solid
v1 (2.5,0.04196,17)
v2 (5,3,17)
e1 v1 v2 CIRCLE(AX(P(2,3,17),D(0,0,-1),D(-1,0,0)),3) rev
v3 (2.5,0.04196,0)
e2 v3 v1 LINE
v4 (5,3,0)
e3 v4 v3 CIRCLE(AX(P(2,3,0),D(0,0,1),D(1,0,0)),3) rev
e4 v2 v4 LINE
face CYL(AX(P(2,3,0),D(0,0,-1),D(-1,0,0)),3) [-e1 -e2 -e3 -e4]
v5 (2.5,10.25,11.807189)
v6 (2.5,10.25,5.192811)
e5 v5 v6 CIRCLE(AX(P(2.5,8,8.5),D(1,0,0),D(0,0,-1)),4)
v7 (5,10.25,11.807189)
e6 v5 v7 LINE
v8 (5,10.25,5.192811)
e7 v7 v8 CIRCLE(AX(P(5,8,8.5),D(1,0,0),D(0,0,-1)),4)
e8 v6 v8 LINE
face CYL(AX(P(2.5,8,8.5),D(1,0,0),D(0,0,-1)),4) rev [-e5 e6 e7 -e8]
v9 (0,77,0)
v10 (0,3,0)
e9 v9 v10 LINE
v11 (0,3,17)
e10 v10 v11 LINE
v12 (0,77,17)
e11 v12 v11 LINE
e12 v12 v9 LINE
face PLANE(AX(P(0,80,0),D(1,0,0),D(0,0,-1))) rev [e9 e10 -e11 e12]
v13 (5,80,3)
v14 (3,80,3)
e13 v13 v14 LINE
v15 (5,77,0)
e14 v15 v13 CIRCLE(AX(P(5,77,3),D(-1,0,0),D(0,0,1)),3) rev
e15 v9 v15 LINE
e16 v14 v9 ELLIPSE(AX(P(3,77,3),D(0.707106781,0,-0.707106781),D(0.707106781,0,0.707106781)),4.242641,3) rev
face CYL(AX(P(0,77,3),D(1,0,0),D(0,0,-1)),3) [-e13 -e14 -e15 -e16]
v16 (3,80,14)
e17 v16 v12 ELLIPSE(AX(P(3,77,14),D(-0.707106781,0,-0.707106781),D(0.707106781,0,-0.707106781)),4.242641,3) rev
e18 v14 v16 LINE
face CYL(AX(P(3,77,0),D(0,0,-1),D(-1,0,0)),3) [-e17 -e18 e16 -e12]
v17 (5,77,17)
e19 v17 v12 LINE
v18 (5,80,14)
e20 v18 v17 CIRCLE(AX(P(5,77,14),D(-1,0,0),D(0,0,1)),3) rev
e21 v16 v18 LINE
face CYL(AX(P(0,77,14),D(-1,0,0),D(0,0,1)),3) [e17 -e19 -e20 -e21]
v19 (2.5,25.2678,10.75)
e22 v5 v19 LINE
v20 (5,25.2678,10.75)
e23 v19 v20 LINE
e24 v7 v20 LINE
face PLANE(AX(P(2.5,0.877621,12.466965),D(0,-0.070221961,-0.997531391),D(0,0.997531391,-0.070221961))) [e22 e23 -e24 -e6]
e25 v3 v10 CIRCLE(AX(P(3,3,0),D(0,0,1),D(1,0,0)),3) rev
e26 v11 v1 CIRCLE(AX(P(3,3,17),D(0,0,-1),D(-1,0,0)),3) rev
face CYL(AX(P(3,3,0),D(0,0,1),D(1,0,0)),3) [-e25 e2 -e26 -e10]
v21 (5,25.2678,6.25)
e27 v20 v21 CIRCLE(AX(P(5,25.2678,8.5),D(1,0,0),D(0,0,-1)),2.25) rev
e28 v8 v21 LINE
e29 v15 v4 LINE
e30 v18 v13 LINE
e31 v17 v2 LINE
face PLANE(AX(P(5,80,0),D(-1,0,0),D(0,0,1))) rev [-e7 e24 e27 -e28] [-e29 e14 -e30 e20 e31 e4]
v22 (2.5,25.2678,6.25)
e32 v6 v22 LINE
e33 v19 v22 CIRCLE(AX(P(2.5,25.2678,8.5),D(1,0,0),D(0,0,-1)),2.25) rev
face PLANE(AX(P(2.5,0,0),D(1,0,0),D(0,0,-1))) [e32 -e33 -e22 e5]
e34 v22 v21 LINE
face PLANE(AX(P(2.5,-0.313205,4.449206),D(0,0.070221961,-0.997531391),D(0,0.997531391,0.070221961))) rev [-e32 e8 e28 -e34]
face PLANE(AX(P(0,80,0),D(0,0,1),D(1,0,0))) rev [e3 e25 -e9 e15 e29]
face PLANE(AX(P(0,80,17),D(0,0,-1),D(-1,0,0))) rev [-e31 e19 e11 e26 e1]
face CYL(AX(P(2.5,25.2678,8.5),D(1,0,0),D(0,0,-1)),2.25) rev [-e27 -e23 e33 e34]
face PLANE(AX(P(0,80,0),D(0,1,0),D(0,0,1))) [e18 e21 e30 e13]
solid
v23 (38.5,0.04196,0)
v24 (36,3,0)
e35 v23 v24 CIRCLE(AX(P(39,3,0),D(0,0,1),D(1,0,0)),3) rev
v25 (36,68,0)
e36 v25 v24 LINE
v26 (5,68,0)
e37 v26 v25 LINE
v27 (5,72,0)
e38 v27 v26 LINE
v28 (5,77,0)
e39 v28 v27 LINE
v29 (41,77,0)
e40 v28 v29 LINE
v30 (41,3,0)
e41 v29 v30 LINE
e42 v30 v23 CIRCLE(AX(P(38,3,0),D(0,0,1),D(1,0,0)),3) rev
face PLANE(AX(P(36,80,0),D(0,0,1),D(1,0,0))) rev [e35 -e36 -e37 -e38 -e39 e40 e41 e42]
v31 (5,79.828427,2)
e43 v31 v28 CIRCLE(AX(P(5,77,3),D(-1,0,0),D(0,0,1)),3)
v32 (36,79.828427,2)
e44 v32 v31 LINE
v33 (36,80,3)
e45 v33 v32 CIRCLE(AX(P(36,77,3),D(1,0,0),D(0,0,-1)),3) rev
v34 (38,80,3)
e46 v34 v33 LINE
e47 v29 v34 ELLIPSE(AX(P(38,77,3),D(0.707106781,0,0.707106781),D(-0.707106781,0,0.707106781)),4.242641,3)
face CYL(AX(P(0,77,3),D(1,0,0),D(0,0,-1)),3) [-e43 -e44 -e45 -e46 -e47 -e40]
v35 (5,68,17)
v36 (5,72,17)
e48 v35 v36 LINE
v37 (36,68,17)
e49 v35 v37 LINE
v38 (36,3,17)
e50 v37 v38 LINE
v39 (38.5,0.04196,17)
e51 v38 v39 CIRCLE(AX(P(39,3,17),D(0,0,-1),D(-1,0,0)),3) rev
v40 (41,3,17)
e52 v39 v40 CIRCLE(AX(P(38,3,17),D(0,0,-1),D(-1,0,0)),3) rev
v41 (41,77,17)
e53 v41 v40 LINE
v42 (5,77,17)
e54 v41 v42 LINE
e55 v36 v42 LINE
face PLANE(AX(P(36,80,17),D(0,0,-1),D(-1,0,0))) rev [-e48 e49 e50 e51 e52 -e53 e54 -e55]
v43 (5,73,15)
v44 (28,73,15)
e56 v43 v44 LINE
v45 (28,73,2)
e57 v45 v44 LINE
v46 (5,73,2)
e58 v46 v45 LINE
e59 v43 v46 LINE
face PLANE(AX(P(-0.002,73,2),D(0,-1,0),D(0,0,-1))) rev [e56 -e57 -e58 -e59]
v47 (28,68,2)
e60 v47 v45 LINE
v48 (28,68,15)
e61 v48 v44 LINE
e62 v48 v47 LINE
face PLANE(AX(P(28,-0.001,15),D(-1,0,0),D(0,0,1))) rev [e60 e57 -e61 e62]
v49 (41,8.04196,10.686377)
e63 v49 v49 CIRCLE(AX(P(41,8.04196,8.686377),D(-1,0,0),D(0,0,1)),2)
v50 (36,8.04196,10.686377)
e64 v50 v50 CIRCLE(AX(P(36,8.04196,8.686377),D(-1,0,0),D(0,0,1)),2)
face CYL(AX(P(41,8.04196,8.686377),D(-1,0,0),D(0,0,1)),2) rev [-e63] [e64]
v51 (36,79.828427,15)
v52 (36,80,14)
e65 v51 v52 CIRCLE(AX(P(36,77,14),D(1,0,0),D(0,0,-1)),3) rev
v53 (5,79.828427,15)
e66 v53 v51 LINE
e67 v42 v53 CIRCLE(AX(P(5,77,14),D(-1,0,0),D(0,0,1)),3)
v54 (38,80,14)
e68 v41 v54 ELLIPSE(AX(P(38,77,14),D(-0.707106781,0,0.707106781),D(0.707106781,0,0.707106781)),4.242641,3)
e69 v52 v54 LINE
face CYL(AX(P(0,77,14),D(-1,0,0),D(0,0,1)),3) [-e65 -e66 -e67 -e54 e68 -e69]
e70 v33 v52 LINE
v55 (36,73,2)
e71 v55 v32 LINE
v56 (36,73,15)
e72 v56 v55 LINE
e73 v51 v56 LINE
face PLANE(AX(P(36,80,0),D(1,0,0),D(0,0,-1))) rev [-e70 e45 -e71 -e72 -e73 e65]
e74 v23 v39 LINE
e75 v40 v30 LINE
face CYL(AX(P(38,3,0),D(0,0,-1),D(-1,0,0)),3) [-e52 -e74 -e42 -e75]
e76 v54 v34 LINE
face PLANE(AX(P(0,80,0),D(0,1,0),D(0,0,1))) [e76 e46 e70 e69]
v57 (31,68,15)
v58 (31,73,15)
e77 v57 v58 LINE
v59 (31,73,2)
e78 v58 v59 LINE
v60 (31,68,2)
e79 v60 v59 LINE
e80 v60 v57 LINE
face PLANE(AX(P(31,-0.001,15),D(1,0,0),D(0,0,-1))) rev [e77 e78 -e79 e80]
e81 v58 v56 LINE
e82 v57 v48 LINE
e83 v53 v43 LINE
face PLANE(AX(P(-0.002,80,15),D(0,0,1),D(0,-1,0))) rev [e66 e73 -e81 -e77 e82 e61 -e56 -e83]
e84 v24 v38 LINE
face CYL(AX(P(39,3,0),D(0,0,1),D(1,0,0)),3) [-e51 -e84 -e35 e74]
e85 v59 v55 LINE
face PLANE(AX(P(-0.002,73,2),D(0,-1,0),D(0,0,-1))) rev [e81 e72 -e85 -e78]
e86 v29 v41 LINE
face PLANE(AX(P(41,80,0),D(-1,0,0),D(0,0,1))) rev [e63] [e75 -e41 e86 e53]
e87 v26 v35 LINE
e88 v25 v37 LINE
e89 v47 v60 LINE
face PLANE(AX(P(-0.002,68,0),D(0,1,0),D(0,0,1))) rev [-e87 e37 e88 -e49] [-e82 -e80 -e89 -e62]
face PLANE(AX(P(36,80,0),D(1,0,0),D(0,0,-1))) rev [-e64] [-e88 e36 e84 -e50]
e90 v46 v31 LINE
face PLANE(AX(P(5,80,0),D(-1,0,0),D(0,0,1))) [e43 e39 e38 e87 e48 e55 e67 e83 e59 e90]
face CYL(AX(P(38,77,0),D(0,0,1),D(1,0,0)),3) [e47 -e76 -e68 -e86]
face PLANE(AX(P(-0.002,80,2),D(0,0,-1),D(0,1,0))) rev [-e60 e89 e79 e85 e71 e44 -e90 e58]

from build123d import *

# Parameters (mm, degrees)
SKETCH1_W             = 5
SKETCH1_H             = 17
BOSS_EXTRUDE1_DEPTH   = 80
BOSS_EXTRUDE1_2_DEPTH = 80
CUT_EXTRUDE1_DEPTH    = 2.5
BOSS_EXTRUDE2_REACH   = 91.359
SKETCH5_W             = 3
SKETCH5_H             = 13
CUT_EXTRUDE2_DEPTH    = 5
FILLET1_R             = 3
FILLET2_R             = 3
SKETCH6_R             = 2
CUT_EXTRUDE3_DEPTH    = 90.358827208


with BuildPart() as part:
    # Sketch1 → Boss-Extrude1 (new body)
    with BuildSketch(Plane(origin=(0, 0, 0), x_dir=(1, 0, 0), z_dir=(0, 1, 0))):
        with Locations((2.5, -8.5)):
            Rectangle(SKETCH1_W, SKETCH1_H)
    extrude(amount=BOSS_EXTRUDE1_DEPTH)

    # Sketch2 → Cut-Extrude1 (cut)
    with BuildSketch(Plane(origin=(5, 0, 0), x_dir=(0, 0, -1), z_dir=(1, 0, 0))):
        with BuildLine():
            Line((-10.75, 25.267799715), (-11.807189139, 10.25))
            ThreePointArc((-11.807189139, 10.25), (-8.5, 12), (-5.192810861, 10.25))
            Line((-5.192810861, 10.25), (-6.25, 25.267799715))
            ThreePointArc((-6.25, 25.267799715), (-8.5, 27.517799715), (-10.75, 25.267799715))
        make_face()
        with BuildLine():
            ThreePointArc((-5.192810861, 10.25), (-8.5, 12), (-11.807189139, 10.25))
            Line((-11.807189139, 10.25), (-11.807189139, 5.75))
            ThreePointArc((-11.807189139, 5.75), (-8.5, 4), (-5.192810861, 5.75))
            Line((-5.192810861, 5.75), (-5.192810861, 10.25))
        make_face()
        with BuildLine():
            Line((-11.807189139, 5.75), (-11.807189139, 10.25))
            ThreePointArc((-11.807189139, 10.25), (-12.5, 8), (-11.807189139, 5.75))
        make_face()
        with BuildLine():
            ThreePointArc((-4.5, 8), (-4.677124344, 9.177124344), (-5.192810861, 10.25))
            Line((-5.192810861, 10.25), (-5.192810861, 5.75))
            ThreePointArc((-5.192810861, 5.75), (-4.677124344, 6.822875656), (-4.5, 8))
        make_face()
    extrude(amount=-CUT_EXTRUDE1_DEPTH, mode=Mode.SUBTRACT)


with BuildPart() as body_2:
    # Sketch1 → Boss-Extrude1 2 (new body)
    with BuildSketch(Plane(origin=(0, 0, 0), x_dir=(1, 0, 0), z_dir=(0, 1, 0))):
        with Locations((38.5, -8.5)):
            Rectangle(SKETCH1_W, SKETCH1_H)
    extrude(amount=BOSS_EXTRUDE1_2_DEPTH)


    # Sketch4 → Boss-Extrude2 (add, up to next)
    with BuildSketch(Plane.ZY.offset(-36), mode=Mode.PRIVATE) as boss_extrude2_sk1:
        Polygon((2, 73), (15, 73), (15, 80), (17, 80), (17, 72), (17, 68), (0, 68), (0, 72), (0, 80), (2, 80), align=None)
    boss_extrude2_tool1 = extrude(boss_extrude2_sk1.sketch, amount=BOSS_EXTRUDE2_REACH, mode=Mode.PRIVATE) - part.part
    add(boss_extrude2_tool1.solids().sort_by_distance((36, 71.986726, 8.5))[0])

    # Sketch5 → Cut-Extrude2 (cut)
    with BuildSketch(Plane(origin=(0, 73, 0), x_dir=(1, 0, 0), z_dir=(0, 1, 0))):
        with Locations((29.5, -8.5)):
            Rectangle(SKETCH5_W, SKETCH5_H)
    extrude(amount=-CUT_EXTRUDE2_DEPTH, mode=Mode.SUBTRACT)

    # Fillet1
    # the kernel refuses this fillet: 3 mm, written as the material it takes off along each edge
    with BuildSketch(Plane(origin=(36, 0, 24.5), x_dir=(0, 1, 0), z_dir=(0, 0, -1)), Plane(origin=(41, 0, -7.5), x_dir=(0, 1, 0), z_dir=(0, 0, 1)), Plane(origin=(41, 80, -7.5), x_dir=(-1, 0, 0), z_dir=(0, 0, 1))) as fillet1_piece_1:
        with BuildLine():
            CenterArc((FILLET1_R, FILLET1_R), FILLET1_R, 180, 90)
            Line((0, FILLET1_R), (0, 0))
            Line((0, 0), (FILLET1_R, 0))
        make_face()
    extrude(amount=32, mode=Mode.SUBTRACT)
    with BuildSketch(Plane(origin=(-2.5, 80, 17), x_dir=(0, 0, -1), z_dir=(1, 0, 0)), Plane(origin=(48.5, 80, 0), x_dir=(0, 0, 1), z_dir=(-1, 0, 0))) as fillet1_piece_2:
        with BuildLine():
            CenterArc((FILLET1_R, -FILLET1_R), FILLET1_R, 90, 90)
            Line((0, -FILLET1_R), (0, 0))
            Line((0, 0), (FILLET1_R, 0))
        make_face()
    extrude(amount=51, mode=Mode.SUBTRACT)

    # Sketch6 → Cut-Extrude3 (cut, through all)
    with BuildSketch(Plane.ZY.offset(-36)):
        with Locations((8.686376561, 8.041960108)):
            Circle(SKETCH6_R)
    extrude(amount=-CUT_EXTRUDE3_DEPTH, mode=Mode.SUBTRACT)


with BuildPart() as part_1:
    add(part.part)

    # Fillet2
    # the kernel refuses this fillet: 3 mm, written as the material it takes off along each edge
    with BuildSketch(Plane(origin=(0, 0, 24.5), x_dir=(0, 1, 0), z_dir=(0, 0, -1)), Plane(origin=(5, 0, -7.5), x_dir=(0, 1, 0), z_dir=(0, 0, 1))) as fillet2_piece_1:
        with BuildLine():
            CenterArc((FILLET2_R, FILLET2_R), FILLET2_R, 180, 90)
            Line((0, FILLET2_R), (0, 0))
            Line((0, 0), (FILLET2_R, 0))
        make_face()
    extrude(amount=32, mode=Mode.SUBTRACT)
    with BuildSketch(Plane(origin=(12.5, 80, 17), x_dir=(0, 0, -1), z_dir=(-1, 0, 0))) as fillet2_piece_2:
        with BuildLine():
            CenterArc((FILLET2_R, FILLET2_R), FILLET2_R, 180, 90)
            Line((0, FILLET2_R), (0, 0))
            Line((0, 0), (FILLET2_R, 0))
        make_face()
    extrude(amount=20, mode=Mode.SUBTRACT)
    with BuildSketch(Plane(origin=(0, 80, 24.5), x_dir=(0, -1, 0), z_dir=(0, 0, -1))) as fillet2_piece_3:
        with BuildLine():
            CenterArc((FILLET2_R, -FILLET2_R), FILLET2_R, 90, 90)
            Line((0, -FILLET2_R), (0, 0))
            Line((0, 0), (FILLET2_R, 0))
        make_face()
    extrude(amount=32, mode=Mode.SUBTRACT)
    with BuildSketch(Plane(origin=(-7.5, 80, 0), x_dir=(0, -1, 0), z_dir=(1, 0, 0))) as fillet2_piece_4:
        with BuildLine():
            CenterArc((FILLET2_R, -FILLET2_R), FILLET2_R, 90, 90)
            Line((0, -FILLET2_R), (0, 0))
            Line((0, 0), (FILLET2_R, 0))
        make_face()
    extrude(amount=20, mode=Mode.SUBTRACT)


solid = Compound([body_2.part, part_1.part])
